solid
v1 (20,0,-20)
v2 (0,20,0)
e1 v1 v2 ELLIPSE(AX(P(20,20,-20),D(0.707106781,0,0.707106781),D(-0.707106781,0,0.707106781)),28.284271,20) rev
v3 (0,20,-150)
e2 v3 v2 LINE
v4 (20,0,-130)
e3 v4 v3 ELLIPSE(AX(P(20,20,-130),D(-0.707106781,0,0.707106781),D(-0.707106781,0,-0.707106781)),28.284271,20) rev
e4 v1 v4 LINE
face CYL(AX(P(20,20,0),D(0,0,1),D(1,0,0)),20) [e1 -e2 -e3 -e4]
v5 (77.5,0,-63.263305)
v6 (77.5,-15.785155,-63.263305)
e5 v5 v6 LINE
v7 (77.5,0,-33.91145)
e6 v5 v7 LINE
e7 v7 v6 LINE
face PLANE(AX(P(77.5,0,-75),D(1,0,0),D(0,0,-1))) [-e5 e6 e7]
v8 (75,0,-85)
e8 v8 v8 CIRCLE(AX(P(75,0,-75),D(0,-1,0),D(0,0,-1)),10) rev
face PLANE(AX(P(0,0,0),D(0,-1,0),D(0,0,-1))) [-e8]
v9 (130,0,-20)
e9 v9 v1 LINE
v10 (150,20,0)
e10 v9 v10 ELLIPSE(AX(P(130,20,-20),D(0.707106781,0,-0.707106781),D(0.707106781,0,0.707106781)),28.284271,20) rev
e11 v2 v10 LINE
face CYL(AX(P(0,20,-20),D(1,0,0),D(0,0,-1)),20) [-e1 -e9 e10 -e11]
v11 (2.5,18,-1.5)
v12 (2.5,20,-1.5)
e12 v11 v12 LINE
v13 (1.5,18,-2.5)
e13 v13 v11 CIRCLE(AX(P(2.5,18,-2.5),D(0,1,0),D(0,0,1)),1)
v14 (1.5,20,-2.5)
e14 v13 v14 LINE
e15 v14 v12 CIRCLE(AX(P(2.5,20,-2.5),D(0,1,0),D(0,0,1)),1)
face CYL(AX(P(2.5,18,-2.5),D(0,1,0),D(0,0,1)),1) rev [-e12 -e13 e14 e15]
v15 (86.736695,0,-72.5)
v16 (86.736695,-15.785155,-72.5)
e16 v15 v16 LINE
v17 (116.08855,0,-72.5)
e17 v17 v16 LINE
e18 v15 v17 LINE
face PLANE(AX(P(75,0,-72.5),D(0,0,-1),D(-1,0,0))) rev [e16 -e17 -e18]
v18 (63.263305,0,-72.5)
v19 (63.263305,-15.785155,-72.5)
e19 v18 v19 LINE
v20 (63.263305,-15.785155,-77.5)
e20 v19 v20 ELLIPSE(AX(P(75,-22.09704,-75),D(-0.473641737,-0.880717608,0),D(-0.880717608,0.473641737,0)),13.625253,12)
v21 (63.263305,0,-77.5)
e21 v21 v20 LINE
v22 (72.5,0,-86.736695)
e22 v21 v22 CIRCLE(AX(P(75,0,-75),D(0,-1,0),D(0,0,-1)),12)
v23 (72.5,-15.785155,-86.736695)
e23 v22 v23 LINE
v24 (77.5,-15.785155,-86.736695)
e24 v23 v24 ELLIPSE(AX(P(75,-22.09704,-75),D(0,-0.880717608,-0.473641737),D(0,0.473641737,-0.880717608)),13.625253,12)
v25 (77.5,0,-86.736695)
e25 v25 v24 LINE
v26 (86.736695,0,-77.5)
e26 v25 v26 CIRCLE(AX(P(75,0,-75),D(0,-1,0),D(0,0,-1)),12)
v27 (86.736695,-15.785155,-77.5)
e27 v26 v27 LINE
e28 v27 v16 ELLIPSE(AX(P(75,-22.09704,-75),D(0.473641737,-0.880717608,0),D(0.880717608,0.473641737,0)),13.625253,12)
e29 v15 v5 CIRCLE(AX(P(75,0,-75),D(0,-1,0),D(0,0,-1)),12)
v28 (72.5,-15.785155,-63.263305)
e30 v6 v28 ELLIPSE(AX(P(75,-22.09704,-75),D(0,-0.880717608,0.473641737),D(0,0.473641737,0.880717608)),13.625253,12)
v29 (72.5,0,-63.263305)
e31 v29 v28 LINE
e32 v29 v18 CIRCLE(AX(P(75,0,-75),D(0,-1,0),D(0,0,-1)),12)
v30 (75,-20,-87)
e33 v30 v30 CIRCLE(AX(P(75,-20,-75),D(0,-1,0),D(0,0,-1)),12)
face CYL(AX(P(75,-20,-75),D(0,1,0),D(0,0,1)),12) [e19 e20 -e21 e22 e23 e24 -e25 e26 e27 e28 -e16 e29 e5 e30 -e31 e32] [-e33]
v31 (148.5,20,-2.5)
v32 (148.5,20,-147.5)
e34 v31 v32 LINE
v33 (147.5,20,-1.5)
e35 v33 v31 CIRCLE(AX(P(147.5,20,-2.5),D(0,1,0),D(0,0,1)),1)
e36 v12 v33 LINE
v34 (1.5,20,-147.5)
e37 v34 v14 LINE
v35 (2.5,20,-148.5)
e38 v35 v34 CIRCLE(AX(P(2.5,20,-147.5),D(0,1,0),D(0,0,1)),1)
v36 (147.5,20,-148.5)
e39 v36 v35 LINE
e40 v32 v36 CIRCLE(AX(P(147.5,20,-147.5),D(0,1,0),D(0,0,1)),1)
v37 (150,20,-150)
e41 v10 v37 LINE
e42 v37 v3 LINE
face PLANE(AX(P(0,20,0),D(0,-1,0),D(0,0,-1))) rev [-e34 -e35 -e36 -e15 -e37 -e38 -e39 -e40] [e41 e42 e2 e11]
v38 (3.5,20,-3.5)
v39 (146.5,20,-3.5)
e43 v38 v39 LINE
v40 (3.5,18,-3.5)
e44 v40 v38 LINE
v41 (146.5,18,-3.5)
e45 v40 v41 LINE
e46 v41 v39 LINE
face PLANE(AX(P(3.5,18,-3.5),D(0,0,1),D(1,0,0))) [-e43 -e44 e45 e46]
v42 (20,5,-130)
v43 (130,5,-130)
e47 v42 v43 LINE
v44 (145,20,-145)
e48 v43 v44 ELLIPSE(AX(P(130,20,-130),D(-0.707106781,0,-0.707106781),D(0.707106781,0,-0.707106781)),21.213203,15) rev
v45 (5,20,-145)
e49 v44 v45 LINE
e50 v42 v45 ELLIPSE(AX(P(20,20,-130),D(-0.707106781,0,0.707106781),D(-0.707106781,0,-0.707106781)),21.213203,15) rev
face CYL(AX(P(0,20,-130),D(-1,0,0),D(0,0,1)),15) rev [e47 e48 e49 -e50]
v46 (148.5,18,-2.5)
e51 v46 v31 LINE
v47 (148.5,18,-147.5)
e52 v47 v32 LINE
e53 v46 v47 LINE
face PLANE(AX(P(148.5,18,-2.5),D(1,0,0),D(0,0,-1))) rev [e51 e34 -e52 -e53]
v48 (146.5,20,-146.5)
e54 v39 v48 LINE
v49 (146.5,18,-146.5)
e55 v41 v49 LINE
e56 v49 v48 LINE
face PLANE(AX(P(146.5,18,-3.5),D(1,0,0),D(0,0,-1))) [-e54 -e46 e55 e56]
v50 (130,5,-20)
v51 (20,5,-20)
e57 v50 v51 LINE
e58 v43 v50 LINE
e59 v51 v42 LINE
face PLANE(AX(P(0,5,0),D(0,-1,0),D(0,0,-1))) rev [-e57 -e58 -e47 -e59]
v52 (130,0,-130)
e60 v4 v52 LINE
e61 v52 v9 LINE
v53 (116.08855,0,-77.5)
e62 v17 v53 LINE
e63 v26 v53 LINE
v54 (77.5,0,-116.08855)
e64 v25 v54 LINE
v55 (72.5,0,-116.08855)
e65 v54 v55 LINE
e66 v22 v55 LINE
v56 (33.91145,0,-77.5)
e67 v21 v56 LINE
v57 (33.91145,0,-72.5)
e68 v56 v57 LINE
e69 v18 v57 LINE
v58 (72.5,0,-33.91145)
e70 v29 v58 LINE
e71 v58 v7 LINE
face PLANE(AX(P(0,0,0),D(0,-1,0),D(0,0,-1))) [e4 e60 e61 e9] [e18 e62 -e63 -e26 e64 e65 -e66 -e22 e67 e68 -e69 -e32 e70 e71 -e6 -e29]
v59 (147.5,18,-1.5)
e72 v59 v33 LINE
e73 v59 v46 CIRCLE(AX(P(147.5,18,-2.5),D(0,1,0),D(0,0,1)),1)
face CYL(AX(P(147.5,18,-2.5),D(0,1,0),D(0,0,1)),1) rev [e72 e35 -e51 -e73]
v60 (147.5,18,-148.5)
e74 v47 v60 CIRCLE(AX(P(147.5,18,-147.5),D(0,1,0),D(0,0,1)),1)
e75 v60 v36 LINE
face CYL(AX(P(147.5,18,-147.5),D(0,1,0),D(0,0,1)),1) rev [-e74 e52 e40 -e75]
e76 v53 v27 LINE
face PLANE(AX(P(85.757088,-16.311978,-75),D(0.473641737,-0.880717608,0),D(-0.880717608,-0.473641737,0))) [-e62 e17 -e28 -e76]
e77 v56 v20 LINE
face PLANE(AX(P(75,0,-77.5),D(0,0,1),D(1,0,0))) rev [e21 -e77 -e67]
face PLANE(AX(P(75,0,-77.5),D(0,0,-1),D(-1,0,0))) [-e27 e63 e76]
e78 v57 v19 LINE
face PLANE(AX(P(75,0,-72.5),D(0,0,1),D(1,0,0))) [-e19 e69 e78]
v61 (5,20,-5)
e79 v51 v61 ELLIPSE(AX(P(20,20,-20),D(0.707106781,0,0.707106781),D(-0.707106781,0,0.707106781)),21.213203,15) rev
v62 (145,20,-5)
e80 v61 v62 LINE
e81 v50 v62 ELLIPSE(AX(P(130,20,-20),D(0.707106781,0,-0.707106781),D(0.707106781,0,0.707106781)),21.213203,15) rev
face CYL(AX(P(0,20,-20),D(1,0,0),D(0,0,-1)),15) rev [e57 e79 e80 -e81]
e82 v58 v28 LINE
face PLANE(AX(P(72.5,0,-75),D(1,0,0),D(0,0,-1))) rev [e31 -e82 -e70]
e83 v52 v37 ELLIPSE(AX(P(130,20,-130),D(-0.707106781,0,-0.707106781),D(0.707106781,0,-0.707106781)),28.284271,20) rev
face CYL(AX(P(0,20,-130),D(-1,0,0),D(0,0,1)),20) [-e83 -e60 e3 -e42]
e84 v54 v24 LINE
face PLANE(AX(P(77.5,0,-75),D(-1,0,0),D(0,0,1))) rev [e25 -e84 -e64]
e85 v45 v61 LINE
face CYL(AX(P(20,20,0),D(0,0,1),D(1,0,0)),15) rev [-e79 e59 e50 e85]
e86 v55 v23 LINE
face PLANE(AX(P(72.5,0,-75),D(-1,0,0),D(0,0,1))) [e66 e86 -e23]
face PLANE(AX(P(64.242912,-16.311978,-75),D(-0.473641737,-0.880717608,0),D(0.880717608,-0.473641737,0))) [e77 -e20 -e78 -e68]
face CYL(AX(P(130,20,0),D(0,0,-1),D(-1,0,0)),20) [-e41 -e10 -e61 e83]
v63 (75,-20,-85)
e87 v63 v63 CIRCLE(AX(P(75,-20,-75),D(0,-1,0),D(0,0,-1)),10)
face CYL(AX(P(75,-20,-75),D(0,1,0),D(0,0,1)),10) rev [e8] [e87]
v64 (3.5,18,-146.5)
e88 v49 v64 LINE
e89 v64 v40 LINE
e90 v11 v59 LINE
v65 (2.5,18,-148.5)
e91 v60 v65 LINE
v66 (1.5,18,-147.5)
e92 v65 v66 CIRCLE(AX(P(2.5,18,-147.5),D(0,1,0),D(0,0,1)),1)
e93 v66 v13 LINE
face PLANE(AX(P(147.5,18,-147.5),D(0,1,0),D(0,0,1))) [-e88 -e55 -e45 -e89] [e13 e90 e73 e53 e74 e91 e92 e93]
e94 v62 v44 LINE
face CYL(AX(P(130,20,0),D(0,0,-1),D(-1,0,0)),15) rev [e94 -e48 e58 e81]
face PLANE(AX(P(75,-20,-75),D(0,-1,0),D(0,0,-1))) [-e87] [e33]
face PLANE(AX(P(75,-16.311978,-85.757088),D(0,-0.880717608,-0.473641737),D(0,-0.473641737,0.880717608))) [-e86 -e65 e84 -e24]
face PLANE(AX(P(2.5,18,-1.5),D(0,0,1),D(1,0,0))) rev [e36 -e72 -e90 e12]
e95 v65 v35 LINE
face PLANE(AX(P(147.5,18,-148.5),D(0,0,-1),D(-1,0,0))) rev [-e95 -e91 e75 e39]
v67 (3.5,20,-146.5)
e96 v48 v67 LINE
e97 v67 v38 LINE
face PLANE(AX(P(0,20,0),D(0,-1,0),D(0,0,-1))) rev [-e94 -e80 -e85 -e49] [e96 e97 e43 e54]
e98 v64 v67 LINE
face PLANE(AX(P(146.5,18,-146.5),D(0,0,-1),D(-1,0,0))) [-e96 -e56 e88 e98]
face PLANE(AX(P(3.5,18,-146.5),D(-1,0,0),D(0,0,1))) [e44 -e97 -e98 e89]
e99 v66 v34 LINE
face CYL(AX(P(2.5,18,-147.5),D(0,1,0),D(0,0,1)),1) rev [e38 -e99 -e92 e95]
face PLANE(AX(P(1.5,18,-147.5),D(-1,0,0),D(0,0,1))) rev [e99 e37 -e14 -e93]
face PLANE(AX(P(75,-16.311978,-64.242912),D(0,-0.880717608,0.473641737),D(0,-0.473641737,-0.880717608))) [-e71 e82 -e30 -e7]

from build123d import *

# Parameters (mm, degrees)
SKETCH1_W           = 150
SKETCH1_H           = 150
BOSS_EXTRUDE1_DEPTH = 20
FILLET8_R           = 20
SHELL1_T            = -5
SKETCH13_W          = 143
SKETCH13_H          = 143
CUT_EXTRUDE5_DEPTH  = 2
SKETCH14_R          = 12
SKETCH14_R_2        = 10
BOSS_EXTRUDE5_DEPTH = 20
RIB18_START         = -2.5
RIB18_DEPTH         = 5
CIRPATTERN1_COUNT   = 4


# Read off the part's stored shape, not the designer's step: Rib18
with BuildPart() as part:
    # Sketch1 → Boss-Extrude1 (new body)
    with BuildSketch(Plane(origin=(0, 0, 0), x_dir=(1, 0, 0), z_dir=(0, 1, 0))):
        with Locations((75, 75)):
            Rectangle(SKETCH1_W, SKETCH1_H)
    extrude(amount=BOSS_EXTRUDE1_DEPTH)

    # Fillet8
    fillet8_edges = [part.edges().sort_by_distance(p)[0] for p in [
        (75, 0, -150),
        (150, 0, -75),
        (75, 0, 0),
        (0, 0, -75),
    ]]
    fillet(fillet8_edges, radius=FILLET8_R - 0.0001)  # a hair under: the kernel refuses the full size

    # Shell1
    shell1_openings = [part.faces().sort_by_distance(p)[0] for p in [
        (75, 20, -75),
    ]]
    offset(amount=SHELL1_T, openings=shell1_openings)

    # Sketch13 → Cut-Extrude5 (cut)
    with BuildSketch(Plane(origin=(0, 20, 0), x_dir=(1, 0, 0), z_dir=(0, 1, 0))):
        with BuildLine():
            Line((1.5, 147.5), (1.5, 2.5))
            ThreePointArc((1.5, 2.5), (1.792893219, 1.792893219), (2.5, 1.5))
            Line((2.5, 1.5), (147.5, 1.5))
            ThreePointArc((147.5, 1.5), (148.207106781, 1.792893219), (148.5, 2.5))
            Line((148.5, 2.5), (148.5, 147.5))
            ThreePointArc((148.5, 147.5), (148.207106781, 148.207106781), (147.5, 148.5))
            Line((147.5, 148.5), (2.5, 148.5))
            ThreePointArc((2.5, 148.5), (1.792893219, 148.207106781), (1.5, 147.5))
        make_face()
        with Locations((75, 75)):
            Rectangle(SKETCH13_W, SKETCH13_H, mode=Mode.SUBTRACT)
    extrude(amount=-CUT_EXTRUDE5_DEPTH, mode=Mode.SUBTRACT)

    # Sketch14 → Boss-Extrude5 (add)
    with BuildSketch(Plane.XZ):
        with Locations(Location((75, -75, 0), (0, 0, 270))):
            Circle(SKETCH14_R)
        with Locations(Location((75, -75, 0), (0, 0, 270))):
            Circle(SKETCH14_R_2, mode=Mode.SUBTRACT)
    extrude(amount=BOSS_EXTRUDE5_DEPTH)

    # Rib18 outline → Rib18 (add)
    with BuildSketch(Plane.ZY.offset(-75).offset(RIB18_START)):
        Polygon((-85, 0), (-116.088549687, 0), (-86.736694594, -15.785154629), (-85, -16.719132826), align=None)
    rib18 = extrude(amount=RIB18_DEPTH)

    # CirPattern1: Rib18 ×4 about axis
    cirpattern1_axis = Axis((75, 0, -75), (0, 1, 0))
    for i in range(1, CIRPATTERN1_COUNT):
        add(rib18.rotate(cirpattern1_axis, i * 360 / CIRPATTERN1_COUNT))


solid = part.part
